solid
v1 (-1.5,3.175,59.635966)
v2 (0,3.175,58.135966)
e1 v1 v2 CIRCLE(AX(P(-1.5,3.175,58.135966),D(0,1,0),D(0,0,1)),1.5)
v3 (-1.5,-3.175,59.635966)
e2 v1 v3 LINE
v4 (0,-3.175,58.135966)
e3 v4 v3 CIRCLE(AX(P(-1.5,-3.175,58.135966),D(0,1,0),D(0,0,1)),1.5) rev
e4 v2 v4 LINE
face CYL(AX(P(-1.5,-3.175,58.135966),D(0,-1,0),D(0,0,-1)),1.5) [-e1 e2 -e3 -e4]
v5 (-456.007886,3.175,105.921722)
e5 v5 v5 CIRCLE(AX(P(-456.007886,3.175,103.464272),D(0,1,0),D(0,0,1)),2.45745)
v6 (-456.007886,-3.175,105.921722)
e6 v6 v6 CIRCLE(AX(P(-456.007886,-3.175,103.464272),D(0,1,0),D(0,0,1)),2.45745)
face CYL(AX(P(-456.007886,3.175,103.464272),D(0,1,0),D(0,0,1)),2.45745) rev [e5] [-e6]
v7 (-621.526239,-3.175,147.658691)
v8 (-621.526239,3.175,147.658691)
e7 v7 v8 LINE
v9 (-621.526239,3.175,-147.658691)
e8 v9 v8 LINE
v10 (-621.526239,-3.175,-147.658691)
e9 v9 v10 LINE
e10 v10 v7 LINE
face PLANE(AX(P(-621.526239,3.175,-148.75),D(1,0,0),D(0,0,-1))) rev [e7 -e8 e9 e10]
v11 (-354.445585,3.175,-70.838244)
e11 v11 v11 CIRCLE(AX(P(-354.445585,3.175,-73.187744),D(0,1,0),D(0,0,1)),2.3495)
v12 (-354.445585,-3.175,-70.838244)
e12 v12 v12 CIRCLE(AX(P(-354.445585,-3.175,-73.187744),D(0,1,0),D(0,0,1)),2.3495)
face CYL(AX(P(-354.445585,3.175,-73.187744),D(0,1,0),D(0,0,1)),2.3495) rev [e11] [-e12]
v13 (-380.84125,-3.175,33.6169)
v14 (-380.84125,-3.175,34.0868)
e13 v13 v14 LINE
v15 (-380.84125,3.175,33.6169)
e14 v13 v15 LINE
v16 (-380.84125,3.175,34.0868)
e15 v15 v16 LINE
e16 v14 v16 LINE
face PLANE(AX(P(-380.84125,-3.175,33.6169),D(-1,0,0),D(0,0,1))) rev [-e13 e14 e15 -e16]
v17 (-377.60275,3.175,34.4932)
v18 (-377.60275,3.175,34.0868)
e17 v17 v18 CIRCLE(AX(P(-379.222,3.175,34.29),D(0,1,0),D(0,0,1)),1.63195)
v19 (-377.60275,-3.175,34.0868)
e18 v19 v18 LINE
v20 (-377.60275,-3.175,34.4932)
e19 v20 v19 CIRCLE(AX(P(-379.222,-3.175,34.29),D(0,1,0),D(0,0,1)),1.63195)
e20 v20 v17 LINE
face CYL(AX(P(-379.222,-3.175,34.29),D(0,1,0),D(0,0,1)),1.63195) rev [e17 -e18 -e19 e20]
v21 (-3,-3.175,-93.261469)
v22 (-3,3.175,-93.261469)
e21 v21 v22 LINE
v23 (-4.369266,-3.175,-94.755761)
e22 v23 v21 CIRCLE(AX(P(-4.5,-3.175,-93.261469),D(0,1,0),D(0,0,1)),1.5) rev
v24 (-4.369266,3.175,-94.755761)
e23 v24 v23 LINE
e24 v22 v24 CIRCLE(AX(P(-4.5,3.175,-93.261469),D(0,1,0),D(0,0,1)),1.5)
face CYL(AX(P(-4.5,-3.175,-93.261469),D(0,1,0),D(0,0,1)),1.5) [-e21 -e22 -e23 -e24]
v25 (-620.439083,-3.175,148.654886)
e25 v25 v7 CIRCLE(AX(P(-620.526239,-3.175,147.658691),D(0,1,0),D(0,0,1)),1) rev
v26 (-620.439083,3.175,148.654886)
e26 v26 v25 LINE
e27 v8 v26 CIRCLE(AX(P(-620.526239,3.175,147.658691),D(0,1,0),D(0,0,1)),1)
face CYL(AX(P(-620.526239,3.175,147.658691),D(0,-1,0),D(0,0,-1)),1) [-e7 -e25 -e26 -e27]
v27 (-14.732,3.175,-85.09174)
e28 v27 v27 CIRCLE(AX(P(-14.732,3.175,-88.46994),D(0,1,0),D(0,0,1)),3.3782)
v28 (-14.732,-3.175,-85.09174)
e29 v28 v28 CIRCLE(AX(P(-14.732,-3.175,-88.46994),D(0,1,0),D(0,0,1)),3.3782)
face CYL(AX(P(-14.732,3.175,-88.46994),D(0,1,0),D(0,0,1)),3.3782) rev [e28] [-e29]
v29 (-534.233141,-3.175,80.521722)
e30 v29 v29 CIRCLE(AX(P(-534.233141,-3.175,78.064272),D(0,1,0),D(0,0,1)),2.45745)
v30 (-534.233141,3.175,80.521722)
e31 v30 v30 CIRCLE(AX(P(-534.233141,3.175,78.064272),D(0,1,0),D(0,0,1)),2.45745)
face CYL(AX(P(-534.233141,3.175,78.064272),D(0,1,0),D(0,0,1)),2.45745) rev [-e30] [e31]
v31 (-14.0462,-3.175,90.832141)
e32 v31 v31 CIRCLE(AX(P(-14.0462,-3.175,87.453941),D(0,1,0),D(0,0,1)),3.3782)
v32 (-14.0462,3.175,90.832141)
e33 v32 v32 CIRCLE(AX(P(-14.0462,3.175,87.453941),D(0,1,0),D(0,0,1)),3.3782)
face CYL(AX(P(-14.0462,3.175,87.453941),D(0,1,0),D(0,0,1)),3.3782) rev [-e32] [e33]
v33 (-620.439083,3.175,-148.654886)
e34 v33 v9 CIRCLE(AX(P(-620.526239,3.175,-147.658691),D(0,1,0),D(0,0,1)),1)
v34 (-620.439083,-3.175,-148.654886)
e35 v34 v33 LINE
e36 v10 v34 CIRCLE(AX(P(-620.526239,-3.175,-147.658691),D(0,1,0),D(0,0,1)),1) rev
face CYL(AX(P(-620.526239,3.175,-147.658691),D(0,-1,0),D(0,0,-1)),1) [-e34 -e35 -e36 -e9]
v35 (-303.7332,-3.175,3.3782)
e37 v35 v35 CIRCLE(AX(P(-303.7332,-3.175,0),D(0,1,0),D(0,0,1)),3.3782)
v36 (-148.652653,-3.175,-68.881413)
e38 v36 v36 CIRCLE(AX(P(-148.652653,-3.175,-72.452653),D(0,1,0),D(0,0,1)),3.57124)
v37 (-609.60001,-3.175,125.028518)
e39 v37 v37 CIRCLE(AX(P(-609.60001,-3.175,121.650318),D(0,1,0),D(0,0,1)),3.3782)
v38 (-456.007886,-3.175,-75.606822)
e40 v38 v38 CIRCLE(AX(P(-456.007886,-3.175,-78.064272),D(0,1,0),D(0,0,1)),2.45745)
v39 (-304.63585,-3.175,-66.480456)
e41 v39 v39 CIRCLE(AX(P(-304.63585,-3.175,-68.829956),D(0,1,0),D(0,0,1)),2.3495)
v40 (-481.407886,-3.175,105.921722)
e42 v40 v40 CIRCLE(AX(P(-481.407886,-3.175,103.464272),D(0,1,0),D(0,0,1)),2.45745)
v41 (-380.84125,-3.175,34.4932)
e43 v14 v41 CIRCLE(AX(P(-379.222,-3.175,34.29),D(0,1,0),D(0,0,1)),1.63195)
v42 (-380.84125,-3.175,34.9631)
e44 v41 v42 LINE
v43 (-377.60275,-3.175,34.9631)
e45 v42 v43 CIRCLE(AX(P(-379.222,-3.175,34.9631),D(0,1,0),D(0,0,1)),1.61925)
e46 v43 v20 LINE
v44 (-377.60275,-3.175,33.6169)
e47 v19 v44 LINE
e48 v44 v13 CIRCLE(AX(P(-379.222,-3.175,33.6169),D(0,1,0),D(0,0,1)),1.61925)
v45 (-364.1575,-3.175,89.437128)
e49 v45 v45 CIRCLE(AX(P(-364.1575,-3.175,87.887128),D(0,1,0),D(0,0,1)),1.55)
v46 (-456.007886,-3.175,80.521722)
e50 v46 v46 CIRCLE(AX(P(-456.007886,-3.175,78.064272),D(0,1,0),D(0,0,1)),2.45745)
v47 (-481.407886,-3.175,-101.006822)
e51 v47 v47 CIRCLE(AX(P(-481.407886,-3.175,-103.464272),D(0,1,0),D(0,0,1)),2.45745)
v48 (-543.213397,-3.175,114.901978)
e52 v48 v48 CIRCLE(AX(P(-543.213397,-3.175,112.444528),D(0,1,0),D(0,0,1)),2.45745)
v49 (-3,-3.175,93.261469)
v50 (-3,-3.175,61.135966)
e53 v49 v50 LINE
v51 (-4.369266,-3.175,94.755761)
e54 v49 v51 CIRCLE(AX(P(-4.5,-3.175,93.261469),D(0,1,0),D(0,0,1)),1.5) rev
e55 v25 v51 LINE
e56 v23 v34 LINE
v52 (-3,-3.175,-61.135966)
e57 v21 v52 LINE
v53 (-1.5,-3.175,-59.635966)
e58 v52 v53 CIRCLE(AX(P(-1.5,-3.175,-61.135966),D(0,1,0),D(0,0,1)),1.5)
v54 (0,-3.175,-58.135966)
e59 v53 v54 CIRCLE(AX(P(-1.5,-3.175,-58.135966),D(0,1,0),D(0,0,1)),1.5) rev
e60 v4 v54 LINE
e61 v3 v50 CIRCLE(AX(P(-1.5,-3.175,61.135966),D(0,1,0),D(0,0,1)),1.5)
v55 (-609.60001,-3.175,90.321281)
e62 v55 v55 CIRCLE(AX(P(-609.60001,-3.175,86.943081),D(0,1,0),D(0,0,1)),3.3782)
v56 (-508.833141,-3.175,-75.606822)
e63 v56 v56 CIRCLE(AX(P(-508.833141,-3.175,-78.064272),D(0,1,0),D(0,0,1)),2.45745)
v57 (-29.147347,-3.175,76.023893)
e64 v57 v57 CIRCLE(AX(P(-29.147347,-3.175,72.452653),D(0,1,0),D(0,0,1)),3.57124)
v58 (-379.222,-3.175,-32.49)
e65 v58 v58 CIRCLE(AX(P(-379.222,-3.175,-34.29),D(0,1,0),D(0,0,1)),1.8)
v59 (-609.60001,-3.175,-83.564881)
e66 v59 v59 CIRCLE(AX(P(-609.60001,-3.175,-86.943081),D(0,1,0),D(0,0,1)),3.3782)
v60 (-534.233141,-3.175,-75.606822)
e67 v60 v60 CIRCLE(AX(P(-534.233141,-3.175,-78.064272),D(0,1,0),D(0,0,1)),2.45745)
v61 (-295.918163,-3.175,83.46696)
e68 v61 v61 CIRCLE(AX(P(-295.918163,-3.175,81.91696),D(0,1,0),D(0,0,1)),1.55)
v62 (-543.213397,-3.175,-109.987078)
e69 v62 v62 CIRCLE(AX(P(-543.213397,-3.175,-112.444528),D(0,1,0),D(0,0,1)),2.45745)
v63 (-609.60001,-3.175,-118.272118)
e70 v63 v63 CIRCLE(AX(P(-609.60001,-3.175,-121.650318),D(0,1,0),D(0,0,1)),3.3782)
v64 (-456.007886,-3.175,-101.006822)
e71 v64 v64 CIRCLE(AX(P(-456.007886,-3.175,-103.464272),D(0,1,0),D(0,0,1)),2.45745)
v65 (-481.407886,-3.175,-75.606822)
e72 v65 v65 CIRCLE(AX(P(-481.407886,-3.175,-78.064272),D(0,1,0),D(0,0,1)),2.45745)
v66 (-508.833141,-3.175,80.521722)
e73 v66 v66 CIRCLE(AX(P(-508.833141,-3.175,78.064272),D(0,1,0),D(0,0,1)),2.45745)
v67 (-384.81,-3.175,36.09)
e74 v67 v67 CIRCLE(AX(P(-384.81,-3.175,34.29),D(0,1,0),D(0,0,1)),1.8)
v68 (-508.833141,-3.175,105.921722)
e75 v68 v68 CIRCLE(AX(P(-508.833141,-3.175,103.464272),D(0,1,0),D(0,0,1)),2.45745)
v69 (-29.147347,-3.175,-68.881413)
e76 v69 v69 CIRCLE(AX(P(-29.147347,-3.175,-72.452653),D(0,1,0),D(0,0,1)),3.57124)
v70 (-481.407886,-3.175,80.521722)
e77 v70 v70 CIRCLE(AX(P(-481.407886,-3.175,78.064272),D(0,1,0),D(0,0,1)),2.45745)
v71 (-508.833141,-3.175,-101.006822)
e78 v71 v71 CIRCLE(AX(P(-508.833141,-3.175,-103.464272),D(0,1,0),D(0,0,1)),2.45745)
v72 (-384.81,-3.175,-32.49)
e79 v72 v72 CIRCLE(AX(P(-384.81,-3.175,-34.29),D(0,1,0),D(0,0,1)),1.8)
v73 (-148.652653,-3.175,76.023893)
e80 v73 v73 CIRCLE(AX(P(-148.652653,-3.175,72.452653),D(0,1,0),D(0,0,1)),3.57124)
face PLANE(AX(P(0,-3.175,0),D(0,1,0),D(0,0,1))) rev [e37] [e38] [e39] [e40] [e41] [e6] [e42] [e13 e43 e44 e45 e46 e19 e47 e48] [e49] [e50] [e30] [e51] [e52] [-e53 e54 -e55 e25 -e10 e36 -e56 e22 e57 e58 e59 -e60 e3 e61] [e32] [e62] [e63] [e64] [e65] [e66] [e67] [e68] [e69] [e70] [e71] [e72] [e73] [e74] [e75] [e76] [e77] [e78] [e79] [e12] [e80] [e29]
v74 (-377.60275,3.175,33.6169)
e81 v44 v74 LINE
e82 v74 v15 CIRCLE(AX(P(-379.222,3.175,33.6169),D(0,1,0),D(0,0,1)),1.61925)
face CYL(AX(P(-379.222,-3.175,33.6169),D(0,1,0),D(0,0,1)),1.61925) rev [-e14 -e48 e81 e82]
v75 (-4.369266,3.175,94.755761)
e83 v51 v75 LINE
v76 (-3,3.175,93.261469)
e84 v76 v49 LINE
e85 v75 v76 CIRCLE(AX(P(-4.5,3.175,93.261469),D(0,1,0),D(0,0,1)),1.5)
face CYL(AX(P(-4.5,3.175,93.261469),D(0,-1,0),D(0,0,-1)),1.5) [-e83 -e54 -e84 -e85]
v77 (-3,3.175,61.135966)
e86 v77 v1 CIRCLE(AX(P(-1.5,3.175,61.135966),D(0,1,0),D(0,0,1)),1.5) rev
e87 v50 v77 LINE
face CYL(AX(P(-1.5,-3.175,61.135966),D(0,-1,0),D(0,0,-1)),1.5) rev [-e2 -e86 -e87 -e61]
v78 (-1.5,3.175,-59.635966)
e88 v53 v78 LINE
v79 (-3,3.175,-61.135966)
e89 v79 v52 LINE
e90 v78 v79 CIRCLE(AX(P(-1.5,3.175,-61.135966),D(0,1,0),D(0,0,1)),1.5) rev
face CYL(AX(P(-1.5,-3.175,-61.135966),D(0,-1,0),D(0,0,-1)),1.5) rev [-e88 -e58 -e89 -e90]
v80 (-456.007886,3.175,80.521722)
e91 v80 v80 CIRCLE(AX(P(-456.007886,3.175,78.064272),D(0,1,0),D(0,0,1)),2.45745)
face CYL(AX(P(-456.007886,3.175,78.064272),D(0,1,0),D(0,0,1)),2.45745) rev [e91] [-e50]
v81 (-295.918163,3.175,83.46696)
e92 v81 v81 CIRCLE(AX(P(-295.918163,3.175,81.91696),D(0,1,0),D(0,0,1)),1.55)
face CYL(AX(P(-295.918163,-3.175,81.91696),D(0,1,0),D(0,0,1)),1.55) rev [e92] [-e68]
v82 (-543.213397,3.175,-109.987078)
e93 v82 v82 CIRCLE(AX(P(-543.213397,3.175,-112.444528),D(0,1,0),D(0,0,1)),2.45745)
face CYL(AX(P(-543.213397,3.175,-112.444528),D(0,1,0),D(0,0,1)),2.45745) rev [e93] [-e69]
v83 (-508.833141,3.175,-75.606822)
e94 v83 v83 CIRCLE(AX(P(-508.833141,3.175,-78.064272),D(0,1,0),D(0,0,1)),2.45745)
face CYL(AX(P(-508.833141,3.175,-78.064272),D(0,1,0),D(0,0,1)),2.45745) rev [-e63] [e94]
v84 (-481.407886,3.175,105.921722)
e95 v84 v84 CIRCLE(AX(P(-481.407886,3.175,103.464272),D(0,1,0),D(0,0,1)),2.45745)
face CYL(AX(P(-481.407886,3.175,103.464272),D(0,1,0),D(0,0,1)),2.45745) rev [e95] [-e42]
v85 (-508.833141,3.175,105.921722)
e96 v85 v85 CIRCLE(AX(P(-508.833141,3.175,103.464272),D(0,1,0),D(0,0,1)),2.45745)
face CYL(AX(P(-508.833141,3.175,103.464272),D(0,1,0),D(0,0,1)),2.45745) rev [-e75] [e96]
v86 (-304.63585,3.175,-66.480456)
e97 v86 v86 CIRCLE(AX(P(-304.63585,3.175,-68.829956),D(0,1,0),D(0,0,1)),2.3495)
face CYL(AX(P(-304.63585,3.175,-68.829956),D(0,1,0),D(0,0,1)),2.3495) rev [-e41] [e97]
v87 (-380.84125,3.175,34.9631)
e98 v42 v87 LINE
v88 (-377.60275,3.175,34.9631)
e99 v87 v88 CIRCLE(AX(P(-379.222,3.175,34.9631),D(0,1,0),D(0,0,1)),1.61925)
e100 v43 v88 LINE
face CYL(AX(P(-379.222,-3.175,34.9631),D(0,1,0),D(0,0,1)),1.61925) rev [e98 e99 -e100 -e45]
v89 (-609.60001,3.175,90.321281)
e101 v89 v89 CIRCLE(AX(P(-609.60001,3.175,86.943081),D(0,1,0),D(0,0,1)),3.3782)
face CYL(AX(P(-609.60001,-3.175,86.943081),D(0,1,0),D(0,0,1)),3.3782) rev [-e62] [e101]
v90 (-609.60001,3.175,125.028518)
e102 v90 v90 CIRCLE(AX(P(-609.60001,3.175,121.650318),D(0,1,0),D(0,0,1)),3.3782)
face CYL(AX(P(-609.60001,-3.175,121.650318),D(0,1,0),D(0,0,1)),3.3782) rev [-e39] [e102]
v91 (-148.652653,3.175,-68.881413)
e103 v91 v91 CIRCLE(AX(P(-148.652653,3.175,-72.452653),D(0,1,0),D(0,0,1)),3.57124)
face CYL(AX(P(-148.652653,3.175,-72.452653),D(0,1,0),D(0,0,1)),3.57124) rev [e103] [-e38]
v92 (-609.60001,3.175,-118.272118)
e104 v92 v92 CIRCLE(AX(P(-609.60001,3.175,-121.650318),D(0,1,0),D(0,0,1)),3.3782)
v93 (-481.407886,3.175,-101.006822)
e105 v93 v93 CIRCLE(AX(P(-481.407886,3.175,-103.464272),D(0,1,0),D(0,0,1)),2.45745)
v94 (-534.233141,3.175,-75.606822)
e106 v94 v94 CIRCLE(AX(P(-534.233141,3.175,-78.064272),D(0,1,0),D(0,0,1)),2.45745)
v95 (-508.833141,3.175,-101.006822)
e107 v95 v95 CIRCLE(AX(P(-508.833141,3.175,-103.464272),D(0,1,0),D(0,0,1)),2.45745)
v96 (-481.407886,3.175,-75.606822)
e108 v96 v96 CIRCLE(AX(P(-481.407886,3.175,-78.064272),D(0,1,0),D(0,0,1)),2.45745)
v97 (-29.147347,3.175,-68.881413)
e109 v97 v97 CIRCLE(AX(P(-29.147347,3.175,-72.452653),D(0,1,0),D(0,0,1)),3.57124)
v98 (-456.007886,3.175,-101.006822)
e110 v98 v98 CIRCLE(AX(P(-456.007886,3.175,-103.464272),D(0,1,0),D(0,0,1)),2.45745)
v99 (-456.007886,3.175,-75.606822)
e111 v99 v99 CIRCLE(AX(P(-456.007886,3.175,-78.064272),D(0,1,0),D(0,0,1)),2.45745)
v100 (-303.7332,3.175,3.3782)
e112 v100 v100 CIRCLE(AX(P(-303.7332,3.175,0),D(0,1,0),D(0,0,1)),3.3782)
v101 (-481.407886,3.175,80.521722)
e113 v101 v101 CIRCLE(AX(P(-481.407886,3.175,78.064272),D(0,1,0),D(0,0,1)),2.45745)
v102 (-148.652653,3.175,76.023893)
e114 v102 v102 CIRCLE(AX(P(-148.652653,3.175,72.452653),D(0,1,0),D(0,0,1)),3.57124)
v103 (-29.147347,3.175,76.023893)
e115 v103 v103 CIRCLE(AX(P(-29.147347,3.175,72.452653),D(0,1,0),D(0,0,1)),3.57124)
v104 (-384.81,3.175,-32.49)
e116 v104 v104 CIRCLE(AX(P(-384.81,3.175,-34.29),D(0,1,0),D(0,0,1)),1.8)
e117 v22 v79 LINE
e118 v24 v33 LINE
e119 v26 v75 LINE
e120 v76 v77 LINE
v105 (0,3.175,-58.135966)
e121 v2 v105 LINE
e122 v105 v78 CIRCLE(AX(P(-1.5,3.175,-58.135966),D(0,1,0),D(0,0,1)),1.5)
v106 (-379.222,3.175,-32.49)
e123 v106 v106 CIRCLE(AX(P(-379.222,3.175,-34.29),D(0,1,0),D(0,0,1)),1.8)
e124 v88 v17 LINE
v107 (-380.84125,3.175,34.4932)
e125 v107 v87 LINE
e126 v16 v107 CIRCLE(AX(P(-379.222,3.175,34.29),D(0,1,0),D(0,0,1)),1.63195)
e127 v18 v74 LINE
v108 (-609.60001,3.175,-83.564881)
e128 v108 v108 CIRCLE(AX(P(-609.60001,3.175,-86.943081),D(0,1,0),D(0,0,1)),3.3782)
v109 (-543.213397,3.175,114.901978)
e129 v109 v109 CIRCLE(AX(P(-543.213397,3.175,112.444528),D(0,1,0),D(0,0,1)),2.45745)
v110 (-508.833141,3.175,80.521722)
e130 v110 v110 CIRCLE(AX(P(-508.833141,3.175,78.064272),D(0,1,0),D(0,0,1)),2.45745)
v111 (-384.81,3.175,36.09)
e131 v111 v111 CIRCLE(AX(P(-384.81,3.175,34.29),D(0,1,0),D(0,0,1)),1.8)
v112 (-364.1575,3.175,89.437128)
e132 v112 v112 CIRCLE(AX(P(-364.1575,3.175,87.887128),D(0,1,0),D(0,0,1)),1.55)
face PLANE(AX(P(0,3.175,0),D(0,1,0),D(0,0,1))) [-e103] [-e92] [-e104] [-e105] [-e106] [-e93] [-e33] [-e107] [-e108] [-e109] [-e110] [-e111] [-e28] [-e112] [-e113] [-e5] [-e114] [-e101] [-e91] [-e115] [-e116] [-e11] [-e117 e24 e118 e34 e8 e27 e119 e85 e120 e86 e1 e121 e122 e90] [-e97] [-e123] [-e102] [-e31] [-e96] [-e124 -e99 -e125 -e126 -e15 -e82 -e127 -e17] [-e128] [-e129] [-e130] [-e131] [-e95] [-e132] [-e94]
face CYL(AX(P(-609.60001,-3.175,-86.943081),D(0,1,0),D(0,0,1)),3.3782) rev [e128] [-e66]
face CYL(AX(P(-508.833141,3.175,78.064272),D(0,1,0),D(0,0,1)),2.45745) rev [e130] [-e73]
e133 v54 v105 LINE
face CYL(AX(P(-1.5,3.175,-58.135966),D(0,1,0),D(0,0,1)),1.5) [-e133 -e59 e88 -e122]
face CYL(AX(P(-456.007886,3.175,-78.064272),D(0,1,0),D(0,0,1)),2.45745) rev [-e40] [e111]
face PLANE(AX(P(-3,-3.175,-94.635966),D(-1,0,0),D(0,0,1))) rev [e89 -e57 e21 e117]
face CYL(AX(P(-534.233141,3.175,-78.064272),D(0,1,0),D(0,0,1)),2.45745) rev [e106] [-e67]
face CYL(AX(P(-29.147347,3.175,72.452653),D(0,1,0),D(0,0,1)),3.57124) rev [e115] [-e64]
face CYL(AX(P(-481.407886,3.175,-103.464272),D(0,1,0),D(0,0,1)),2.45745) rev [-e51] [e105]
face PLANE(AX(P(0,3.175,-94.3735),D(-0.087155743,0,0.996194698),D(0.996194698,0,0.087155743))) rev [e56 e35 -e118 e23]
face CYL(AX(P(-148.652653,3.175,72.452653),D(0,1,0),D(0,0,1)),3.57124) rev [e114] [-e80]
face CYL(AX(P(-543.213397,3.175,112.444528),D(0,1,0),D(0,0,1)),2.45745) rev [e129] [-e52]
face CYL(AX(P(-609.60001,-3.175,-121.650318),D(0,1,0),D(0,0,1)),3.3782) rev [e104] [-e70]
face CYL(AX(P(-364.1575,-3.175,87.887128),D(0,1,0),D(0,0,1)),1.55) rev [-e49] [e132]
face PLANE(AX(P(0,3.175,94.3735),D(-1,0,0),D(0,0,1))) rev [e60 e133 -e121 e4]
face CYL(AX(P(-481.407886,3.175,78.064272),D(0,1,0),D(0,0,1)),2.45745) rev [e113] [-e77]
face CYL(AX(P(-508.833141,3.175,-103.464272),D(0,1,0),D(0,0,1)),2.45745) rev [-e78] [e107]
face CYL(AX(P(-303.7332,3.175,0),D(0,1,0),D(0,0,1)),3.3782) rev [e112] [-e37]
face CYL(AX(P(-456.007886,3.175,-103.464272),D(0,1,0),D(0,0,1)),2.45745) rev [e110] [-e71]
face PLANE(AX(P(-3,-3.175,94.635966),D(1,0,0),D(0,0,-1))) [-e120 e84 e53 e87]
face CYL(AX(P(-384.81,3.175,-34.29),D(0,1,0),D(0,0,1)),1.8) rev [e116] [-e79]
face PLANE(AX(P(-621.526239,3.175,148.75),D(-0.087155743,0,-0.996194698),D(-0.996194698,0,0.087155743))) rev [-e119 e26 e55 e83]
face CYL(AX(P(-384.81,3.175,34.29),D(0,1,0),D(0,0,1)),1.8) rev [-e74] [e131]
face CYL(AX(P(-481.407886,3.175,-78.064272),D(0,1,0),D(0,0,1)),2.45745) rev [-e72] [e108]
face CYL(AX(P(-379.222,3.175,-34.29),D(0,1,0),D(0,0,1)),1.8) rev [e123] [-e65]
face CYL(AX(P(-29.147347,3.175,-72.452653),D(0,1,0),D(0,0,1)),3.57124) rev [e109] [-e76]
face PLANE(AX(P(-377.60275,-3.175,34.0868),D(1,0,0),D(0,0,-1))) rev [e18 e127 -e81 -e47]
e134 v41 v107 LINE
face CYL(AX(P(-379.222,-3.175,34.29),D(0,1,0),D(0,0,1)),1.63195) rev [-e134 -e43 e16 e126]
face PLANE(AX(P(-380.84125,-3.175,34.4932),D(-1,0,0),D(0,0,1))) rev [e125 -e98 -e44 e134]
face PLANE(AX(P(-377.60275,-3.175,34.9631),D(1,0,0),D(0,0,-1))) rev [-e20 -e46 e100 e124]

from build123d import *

# Parameters (mm, degrees)
BOSS_EXTRUDE1_DEPTH         = 3.175
M3_CLEARANCE_HOLE1_D        = 3.6
F_1_4_CLEARANCE_HOLE1_D     = 7.14248
CUT_EXTRUDE1_DEPTH          = 640.11012417
F_8_CLEARANCE_HOLE1_D       = 4.9149
SKETCH15_R                  = 1.55
CUT_EXTRUDE2_DEPTH          = 640.11012417
SKETCH16_R                  = 3.3782
CUT_EXTRUDE3_DEPTH          = 640.11012417
FILLET1_R                   = 1
CUT_EXTRUDE4_DEPTH          = 640.088878697
FILLET2_R                   = 1.5
F_13_0_185_DIAMETER_HOLE1_D = 4.699
F_1_4_CLEARANCE_HOLE2_D     = 6.7564


with BuildPart() as part:
    # Sketch1 → Boss-Extrude1 (new, symmetric)
    with BuildSketch(Plane(origin=(0, 0, 0), x_dir=(1, 0, 0), z_dir=(0, 1, 0))):
        Polygon((0, -94.3735), (0, 94.3735), (-621.526239041, 148.75), (-621.526239041, -148.75), align=None)
    extrude(amount=BOSS_EXTRUDE1_DEPTH, both=True)

    # M3 Clearance Hole1 (through all)
    with Locations(Plane(origin=(0, 3.175, 0), x_dir=(1, 0, 0), z_dir=(0, 1, 0))):
        with Locations((-379.222, 34.29), (-384.81, 34.29), (-384.81, -34.29)):
            Hole(M3_CLEARANCE_HOLE1_D / 2)

    # 1/4 Clearance Hole1 (through all)
    with Locations(Plane(origin=(0, 3.175, 0), x_dir=(1, 0, 0), z_dir=(0, 1, 0))):
        with Locations((-29.147346667, 72.452653333), (-29.147346667, -72.452653333), (-148.652653333, -72.452653333), (-148.652653333, 72.452653333)):
            Hole(F_1_4_CLEARANCE_HOLE1_D / 2)

    # Sketch12 → Cut-Extrude1 (cut, through all)
    with BuildSketch(Plane(origin=(0, 3.175, 0), x_dir=(1, 0, 0), z_dir=(0, 1, 0))):
        with BuildLine():
            Line((-380.84125, -33.6169), (-380.84125, -34.0868))
            ThreePointArc((-380.84125, -34.0868), (-380.85395, -34.29), (-380.84125, -34.4932))
            Line((-380.84125, -34.4932), (-380.84125, -34.9631))
            ThreePointArc((-380.84125, -34.9631), (-379.222, -36.58235), (-377.60275, -34.9631))
            Line((-377.60275, -34.9631), (-377.60275, -34.4932))
            ThreePointArc((-377.60275, -34.4932), (-377.59005, -34.29), (-377.60275, -34.0868))
            Line((-377.60275, -34.0868), (-377.60275, -33.6169))
            ThreePointArc((-377.60275, -33.6169), (-379.222, -31.99765), (-380.84125, -33.6169))
        make_face()
    extrude(amount=-CUT_EXTRUDE1_DEPTH, mode=Mode.SUBTRACT)

    # #8 Clearance Hole1 (through all)
    with Locations(Plane(origin=(0, 3.175, 0), x_dir=(1, 0, 0), z_dir=(0, 1, 0))):
        with Locations((-508.833140591, -78.064272283), (-508.833140591, -103.464272283), (-543.213396712, -112.444528404), (-534.233140591, -78.064272283), (-481.407885674, -78.064272283), (-481.407885674, -103.464272283), (-456.007885674, -78.064272283), (-456.007885674, -103.464272283), (-456.007885674, 78.064272283), (-456.007885674, 103.464272283), (-481.407885674, 78.064272283), (-481.407885674, 103.464272283), (-543.213396712, 112.444528404), (-534.233140591, 78.064272283), (-508.833140591, 103.464272283), (-508.833140591, 78.064272283)):
            Hole(F_8_CLEARANCE_HOLE1_D / 2)

    # Sketch15 → Cut-Extrude2 (cut, through all)
    with BuildSketch(Plane(origin=(0, 3.175, 0), x_dir=(1, 0, 0), z_dir=(0, 1, 0))):
        with Locations(Location((-295.918163181, -81.916960017, 0), (0, 0, 270))):
            Circle(SKETCH15_R)
        with Locations(Location((-364.1575, -87.887128395, 0), (0, 0, 270))):
            Circle(SKETCH15_R)
    extrude(amount=-CUT_EXTRUDE2_DEPTH, mode=Mode.SUBTRACT)

    # Sketch16 → Cut-Extrude3 (cut, through all)
    with BuildSketch(Plane(origin=(0, 3.175, 0), x_dir=(1, 0, 0), z_dir=(0, 1, 0))):
        with Locations(Location((-609.6000104, -121.650317511, 0), (0, 0, 270))):
            Circle(SKETCH16_R)
        with Locations(Location((-609.6000104, -86.943080709, 0), (0, 0, 270))):
            Circle(SKETCH16_R)
        with Locations(Location((-609.6000104, 86.943080709, 0), (0, 0, 270))):
            Circle(SKETCH16_R)
        with Locations(Location((-609.6000104, 121.650317511, 0), (0, 0, 270))):
            Circle(SKETCH16_R)
    extrude(amount=-CUT_EXTRUDE3_DEPTH, mode=Mode.SUBTRACT)

    # Fillet1
    fillet1_edges = [part.edges().sort_by_distance(p)[0] for p in [
        (-621.526239041, 0, 148.75),
        (-621.526239041, 0, -148.75),
    ]]
    fillet(fillet1_edges, radius=FILLET1_R)

    # Sketch17 → Cut-Extrude4 (cut, through all)
    with BuildSketch(Plane(origin=(0, 3.175, 0), x_dir=(1, 0, 0), z_dir=(0, 1, 0))):
        Polygon((-3, 94.635965991), (-3, 59.635965991), (0, 59.635965991), (0, 94.3735), align=None)
    cut_extrude4 = extrude(amount=-CUT_EXTRUDE4_DEPTH, mode=Mode.SUBTRACT)

    # Mirror1: Cut-Extrude4 across plane
    add(cut_extrude4.mirror(Plane.XY), mode=Mode.SUBTRACT)

    # Fillet2
    fillet2_edges = [part.edges().sort_by_distance(p)[0] for p in [
        (0, 0, -59.635965991),
        (-3, 0, -59.635965991),
        (-3, 0, -94.635965991),
        (0, 0, 59.635965991),
        (-3, 0, 59.635965991),
        (-3, 0, 94.635965991),
    ]]
    fillet(fillet2_edges, radius=FILLET2_R - 0.0001)  # a hair under: the kernel refuses the full size

    # #13 (0.185) Diameter Hole1 (through all)
    with Locations(Plane(origin=(0, 3.175, 0), x_dir=(1, 0, 0), z_dir=(0, 1, 0))):
        with Locations((-354.44558465, 73.187743603), (-304.635849746, 68.829956465)):
            Hole(F_13_0_185_DIAMETER_HOLE1_D / 2)

    # 1/4 Clearance Hole2 (through all)
    with Locations(Plane(origin=(0, 3.175, 0), x_dir=(1, 0, 0), z_dir=(0, 1, 0))):
        with Locations((-14.732, 88.469940408), (-14.0462, -87.453940528), (-303.7332, 0)):
            Hole(F_1_4_CLEARANCE_HOLE2_D / 2)


solid = part.part
